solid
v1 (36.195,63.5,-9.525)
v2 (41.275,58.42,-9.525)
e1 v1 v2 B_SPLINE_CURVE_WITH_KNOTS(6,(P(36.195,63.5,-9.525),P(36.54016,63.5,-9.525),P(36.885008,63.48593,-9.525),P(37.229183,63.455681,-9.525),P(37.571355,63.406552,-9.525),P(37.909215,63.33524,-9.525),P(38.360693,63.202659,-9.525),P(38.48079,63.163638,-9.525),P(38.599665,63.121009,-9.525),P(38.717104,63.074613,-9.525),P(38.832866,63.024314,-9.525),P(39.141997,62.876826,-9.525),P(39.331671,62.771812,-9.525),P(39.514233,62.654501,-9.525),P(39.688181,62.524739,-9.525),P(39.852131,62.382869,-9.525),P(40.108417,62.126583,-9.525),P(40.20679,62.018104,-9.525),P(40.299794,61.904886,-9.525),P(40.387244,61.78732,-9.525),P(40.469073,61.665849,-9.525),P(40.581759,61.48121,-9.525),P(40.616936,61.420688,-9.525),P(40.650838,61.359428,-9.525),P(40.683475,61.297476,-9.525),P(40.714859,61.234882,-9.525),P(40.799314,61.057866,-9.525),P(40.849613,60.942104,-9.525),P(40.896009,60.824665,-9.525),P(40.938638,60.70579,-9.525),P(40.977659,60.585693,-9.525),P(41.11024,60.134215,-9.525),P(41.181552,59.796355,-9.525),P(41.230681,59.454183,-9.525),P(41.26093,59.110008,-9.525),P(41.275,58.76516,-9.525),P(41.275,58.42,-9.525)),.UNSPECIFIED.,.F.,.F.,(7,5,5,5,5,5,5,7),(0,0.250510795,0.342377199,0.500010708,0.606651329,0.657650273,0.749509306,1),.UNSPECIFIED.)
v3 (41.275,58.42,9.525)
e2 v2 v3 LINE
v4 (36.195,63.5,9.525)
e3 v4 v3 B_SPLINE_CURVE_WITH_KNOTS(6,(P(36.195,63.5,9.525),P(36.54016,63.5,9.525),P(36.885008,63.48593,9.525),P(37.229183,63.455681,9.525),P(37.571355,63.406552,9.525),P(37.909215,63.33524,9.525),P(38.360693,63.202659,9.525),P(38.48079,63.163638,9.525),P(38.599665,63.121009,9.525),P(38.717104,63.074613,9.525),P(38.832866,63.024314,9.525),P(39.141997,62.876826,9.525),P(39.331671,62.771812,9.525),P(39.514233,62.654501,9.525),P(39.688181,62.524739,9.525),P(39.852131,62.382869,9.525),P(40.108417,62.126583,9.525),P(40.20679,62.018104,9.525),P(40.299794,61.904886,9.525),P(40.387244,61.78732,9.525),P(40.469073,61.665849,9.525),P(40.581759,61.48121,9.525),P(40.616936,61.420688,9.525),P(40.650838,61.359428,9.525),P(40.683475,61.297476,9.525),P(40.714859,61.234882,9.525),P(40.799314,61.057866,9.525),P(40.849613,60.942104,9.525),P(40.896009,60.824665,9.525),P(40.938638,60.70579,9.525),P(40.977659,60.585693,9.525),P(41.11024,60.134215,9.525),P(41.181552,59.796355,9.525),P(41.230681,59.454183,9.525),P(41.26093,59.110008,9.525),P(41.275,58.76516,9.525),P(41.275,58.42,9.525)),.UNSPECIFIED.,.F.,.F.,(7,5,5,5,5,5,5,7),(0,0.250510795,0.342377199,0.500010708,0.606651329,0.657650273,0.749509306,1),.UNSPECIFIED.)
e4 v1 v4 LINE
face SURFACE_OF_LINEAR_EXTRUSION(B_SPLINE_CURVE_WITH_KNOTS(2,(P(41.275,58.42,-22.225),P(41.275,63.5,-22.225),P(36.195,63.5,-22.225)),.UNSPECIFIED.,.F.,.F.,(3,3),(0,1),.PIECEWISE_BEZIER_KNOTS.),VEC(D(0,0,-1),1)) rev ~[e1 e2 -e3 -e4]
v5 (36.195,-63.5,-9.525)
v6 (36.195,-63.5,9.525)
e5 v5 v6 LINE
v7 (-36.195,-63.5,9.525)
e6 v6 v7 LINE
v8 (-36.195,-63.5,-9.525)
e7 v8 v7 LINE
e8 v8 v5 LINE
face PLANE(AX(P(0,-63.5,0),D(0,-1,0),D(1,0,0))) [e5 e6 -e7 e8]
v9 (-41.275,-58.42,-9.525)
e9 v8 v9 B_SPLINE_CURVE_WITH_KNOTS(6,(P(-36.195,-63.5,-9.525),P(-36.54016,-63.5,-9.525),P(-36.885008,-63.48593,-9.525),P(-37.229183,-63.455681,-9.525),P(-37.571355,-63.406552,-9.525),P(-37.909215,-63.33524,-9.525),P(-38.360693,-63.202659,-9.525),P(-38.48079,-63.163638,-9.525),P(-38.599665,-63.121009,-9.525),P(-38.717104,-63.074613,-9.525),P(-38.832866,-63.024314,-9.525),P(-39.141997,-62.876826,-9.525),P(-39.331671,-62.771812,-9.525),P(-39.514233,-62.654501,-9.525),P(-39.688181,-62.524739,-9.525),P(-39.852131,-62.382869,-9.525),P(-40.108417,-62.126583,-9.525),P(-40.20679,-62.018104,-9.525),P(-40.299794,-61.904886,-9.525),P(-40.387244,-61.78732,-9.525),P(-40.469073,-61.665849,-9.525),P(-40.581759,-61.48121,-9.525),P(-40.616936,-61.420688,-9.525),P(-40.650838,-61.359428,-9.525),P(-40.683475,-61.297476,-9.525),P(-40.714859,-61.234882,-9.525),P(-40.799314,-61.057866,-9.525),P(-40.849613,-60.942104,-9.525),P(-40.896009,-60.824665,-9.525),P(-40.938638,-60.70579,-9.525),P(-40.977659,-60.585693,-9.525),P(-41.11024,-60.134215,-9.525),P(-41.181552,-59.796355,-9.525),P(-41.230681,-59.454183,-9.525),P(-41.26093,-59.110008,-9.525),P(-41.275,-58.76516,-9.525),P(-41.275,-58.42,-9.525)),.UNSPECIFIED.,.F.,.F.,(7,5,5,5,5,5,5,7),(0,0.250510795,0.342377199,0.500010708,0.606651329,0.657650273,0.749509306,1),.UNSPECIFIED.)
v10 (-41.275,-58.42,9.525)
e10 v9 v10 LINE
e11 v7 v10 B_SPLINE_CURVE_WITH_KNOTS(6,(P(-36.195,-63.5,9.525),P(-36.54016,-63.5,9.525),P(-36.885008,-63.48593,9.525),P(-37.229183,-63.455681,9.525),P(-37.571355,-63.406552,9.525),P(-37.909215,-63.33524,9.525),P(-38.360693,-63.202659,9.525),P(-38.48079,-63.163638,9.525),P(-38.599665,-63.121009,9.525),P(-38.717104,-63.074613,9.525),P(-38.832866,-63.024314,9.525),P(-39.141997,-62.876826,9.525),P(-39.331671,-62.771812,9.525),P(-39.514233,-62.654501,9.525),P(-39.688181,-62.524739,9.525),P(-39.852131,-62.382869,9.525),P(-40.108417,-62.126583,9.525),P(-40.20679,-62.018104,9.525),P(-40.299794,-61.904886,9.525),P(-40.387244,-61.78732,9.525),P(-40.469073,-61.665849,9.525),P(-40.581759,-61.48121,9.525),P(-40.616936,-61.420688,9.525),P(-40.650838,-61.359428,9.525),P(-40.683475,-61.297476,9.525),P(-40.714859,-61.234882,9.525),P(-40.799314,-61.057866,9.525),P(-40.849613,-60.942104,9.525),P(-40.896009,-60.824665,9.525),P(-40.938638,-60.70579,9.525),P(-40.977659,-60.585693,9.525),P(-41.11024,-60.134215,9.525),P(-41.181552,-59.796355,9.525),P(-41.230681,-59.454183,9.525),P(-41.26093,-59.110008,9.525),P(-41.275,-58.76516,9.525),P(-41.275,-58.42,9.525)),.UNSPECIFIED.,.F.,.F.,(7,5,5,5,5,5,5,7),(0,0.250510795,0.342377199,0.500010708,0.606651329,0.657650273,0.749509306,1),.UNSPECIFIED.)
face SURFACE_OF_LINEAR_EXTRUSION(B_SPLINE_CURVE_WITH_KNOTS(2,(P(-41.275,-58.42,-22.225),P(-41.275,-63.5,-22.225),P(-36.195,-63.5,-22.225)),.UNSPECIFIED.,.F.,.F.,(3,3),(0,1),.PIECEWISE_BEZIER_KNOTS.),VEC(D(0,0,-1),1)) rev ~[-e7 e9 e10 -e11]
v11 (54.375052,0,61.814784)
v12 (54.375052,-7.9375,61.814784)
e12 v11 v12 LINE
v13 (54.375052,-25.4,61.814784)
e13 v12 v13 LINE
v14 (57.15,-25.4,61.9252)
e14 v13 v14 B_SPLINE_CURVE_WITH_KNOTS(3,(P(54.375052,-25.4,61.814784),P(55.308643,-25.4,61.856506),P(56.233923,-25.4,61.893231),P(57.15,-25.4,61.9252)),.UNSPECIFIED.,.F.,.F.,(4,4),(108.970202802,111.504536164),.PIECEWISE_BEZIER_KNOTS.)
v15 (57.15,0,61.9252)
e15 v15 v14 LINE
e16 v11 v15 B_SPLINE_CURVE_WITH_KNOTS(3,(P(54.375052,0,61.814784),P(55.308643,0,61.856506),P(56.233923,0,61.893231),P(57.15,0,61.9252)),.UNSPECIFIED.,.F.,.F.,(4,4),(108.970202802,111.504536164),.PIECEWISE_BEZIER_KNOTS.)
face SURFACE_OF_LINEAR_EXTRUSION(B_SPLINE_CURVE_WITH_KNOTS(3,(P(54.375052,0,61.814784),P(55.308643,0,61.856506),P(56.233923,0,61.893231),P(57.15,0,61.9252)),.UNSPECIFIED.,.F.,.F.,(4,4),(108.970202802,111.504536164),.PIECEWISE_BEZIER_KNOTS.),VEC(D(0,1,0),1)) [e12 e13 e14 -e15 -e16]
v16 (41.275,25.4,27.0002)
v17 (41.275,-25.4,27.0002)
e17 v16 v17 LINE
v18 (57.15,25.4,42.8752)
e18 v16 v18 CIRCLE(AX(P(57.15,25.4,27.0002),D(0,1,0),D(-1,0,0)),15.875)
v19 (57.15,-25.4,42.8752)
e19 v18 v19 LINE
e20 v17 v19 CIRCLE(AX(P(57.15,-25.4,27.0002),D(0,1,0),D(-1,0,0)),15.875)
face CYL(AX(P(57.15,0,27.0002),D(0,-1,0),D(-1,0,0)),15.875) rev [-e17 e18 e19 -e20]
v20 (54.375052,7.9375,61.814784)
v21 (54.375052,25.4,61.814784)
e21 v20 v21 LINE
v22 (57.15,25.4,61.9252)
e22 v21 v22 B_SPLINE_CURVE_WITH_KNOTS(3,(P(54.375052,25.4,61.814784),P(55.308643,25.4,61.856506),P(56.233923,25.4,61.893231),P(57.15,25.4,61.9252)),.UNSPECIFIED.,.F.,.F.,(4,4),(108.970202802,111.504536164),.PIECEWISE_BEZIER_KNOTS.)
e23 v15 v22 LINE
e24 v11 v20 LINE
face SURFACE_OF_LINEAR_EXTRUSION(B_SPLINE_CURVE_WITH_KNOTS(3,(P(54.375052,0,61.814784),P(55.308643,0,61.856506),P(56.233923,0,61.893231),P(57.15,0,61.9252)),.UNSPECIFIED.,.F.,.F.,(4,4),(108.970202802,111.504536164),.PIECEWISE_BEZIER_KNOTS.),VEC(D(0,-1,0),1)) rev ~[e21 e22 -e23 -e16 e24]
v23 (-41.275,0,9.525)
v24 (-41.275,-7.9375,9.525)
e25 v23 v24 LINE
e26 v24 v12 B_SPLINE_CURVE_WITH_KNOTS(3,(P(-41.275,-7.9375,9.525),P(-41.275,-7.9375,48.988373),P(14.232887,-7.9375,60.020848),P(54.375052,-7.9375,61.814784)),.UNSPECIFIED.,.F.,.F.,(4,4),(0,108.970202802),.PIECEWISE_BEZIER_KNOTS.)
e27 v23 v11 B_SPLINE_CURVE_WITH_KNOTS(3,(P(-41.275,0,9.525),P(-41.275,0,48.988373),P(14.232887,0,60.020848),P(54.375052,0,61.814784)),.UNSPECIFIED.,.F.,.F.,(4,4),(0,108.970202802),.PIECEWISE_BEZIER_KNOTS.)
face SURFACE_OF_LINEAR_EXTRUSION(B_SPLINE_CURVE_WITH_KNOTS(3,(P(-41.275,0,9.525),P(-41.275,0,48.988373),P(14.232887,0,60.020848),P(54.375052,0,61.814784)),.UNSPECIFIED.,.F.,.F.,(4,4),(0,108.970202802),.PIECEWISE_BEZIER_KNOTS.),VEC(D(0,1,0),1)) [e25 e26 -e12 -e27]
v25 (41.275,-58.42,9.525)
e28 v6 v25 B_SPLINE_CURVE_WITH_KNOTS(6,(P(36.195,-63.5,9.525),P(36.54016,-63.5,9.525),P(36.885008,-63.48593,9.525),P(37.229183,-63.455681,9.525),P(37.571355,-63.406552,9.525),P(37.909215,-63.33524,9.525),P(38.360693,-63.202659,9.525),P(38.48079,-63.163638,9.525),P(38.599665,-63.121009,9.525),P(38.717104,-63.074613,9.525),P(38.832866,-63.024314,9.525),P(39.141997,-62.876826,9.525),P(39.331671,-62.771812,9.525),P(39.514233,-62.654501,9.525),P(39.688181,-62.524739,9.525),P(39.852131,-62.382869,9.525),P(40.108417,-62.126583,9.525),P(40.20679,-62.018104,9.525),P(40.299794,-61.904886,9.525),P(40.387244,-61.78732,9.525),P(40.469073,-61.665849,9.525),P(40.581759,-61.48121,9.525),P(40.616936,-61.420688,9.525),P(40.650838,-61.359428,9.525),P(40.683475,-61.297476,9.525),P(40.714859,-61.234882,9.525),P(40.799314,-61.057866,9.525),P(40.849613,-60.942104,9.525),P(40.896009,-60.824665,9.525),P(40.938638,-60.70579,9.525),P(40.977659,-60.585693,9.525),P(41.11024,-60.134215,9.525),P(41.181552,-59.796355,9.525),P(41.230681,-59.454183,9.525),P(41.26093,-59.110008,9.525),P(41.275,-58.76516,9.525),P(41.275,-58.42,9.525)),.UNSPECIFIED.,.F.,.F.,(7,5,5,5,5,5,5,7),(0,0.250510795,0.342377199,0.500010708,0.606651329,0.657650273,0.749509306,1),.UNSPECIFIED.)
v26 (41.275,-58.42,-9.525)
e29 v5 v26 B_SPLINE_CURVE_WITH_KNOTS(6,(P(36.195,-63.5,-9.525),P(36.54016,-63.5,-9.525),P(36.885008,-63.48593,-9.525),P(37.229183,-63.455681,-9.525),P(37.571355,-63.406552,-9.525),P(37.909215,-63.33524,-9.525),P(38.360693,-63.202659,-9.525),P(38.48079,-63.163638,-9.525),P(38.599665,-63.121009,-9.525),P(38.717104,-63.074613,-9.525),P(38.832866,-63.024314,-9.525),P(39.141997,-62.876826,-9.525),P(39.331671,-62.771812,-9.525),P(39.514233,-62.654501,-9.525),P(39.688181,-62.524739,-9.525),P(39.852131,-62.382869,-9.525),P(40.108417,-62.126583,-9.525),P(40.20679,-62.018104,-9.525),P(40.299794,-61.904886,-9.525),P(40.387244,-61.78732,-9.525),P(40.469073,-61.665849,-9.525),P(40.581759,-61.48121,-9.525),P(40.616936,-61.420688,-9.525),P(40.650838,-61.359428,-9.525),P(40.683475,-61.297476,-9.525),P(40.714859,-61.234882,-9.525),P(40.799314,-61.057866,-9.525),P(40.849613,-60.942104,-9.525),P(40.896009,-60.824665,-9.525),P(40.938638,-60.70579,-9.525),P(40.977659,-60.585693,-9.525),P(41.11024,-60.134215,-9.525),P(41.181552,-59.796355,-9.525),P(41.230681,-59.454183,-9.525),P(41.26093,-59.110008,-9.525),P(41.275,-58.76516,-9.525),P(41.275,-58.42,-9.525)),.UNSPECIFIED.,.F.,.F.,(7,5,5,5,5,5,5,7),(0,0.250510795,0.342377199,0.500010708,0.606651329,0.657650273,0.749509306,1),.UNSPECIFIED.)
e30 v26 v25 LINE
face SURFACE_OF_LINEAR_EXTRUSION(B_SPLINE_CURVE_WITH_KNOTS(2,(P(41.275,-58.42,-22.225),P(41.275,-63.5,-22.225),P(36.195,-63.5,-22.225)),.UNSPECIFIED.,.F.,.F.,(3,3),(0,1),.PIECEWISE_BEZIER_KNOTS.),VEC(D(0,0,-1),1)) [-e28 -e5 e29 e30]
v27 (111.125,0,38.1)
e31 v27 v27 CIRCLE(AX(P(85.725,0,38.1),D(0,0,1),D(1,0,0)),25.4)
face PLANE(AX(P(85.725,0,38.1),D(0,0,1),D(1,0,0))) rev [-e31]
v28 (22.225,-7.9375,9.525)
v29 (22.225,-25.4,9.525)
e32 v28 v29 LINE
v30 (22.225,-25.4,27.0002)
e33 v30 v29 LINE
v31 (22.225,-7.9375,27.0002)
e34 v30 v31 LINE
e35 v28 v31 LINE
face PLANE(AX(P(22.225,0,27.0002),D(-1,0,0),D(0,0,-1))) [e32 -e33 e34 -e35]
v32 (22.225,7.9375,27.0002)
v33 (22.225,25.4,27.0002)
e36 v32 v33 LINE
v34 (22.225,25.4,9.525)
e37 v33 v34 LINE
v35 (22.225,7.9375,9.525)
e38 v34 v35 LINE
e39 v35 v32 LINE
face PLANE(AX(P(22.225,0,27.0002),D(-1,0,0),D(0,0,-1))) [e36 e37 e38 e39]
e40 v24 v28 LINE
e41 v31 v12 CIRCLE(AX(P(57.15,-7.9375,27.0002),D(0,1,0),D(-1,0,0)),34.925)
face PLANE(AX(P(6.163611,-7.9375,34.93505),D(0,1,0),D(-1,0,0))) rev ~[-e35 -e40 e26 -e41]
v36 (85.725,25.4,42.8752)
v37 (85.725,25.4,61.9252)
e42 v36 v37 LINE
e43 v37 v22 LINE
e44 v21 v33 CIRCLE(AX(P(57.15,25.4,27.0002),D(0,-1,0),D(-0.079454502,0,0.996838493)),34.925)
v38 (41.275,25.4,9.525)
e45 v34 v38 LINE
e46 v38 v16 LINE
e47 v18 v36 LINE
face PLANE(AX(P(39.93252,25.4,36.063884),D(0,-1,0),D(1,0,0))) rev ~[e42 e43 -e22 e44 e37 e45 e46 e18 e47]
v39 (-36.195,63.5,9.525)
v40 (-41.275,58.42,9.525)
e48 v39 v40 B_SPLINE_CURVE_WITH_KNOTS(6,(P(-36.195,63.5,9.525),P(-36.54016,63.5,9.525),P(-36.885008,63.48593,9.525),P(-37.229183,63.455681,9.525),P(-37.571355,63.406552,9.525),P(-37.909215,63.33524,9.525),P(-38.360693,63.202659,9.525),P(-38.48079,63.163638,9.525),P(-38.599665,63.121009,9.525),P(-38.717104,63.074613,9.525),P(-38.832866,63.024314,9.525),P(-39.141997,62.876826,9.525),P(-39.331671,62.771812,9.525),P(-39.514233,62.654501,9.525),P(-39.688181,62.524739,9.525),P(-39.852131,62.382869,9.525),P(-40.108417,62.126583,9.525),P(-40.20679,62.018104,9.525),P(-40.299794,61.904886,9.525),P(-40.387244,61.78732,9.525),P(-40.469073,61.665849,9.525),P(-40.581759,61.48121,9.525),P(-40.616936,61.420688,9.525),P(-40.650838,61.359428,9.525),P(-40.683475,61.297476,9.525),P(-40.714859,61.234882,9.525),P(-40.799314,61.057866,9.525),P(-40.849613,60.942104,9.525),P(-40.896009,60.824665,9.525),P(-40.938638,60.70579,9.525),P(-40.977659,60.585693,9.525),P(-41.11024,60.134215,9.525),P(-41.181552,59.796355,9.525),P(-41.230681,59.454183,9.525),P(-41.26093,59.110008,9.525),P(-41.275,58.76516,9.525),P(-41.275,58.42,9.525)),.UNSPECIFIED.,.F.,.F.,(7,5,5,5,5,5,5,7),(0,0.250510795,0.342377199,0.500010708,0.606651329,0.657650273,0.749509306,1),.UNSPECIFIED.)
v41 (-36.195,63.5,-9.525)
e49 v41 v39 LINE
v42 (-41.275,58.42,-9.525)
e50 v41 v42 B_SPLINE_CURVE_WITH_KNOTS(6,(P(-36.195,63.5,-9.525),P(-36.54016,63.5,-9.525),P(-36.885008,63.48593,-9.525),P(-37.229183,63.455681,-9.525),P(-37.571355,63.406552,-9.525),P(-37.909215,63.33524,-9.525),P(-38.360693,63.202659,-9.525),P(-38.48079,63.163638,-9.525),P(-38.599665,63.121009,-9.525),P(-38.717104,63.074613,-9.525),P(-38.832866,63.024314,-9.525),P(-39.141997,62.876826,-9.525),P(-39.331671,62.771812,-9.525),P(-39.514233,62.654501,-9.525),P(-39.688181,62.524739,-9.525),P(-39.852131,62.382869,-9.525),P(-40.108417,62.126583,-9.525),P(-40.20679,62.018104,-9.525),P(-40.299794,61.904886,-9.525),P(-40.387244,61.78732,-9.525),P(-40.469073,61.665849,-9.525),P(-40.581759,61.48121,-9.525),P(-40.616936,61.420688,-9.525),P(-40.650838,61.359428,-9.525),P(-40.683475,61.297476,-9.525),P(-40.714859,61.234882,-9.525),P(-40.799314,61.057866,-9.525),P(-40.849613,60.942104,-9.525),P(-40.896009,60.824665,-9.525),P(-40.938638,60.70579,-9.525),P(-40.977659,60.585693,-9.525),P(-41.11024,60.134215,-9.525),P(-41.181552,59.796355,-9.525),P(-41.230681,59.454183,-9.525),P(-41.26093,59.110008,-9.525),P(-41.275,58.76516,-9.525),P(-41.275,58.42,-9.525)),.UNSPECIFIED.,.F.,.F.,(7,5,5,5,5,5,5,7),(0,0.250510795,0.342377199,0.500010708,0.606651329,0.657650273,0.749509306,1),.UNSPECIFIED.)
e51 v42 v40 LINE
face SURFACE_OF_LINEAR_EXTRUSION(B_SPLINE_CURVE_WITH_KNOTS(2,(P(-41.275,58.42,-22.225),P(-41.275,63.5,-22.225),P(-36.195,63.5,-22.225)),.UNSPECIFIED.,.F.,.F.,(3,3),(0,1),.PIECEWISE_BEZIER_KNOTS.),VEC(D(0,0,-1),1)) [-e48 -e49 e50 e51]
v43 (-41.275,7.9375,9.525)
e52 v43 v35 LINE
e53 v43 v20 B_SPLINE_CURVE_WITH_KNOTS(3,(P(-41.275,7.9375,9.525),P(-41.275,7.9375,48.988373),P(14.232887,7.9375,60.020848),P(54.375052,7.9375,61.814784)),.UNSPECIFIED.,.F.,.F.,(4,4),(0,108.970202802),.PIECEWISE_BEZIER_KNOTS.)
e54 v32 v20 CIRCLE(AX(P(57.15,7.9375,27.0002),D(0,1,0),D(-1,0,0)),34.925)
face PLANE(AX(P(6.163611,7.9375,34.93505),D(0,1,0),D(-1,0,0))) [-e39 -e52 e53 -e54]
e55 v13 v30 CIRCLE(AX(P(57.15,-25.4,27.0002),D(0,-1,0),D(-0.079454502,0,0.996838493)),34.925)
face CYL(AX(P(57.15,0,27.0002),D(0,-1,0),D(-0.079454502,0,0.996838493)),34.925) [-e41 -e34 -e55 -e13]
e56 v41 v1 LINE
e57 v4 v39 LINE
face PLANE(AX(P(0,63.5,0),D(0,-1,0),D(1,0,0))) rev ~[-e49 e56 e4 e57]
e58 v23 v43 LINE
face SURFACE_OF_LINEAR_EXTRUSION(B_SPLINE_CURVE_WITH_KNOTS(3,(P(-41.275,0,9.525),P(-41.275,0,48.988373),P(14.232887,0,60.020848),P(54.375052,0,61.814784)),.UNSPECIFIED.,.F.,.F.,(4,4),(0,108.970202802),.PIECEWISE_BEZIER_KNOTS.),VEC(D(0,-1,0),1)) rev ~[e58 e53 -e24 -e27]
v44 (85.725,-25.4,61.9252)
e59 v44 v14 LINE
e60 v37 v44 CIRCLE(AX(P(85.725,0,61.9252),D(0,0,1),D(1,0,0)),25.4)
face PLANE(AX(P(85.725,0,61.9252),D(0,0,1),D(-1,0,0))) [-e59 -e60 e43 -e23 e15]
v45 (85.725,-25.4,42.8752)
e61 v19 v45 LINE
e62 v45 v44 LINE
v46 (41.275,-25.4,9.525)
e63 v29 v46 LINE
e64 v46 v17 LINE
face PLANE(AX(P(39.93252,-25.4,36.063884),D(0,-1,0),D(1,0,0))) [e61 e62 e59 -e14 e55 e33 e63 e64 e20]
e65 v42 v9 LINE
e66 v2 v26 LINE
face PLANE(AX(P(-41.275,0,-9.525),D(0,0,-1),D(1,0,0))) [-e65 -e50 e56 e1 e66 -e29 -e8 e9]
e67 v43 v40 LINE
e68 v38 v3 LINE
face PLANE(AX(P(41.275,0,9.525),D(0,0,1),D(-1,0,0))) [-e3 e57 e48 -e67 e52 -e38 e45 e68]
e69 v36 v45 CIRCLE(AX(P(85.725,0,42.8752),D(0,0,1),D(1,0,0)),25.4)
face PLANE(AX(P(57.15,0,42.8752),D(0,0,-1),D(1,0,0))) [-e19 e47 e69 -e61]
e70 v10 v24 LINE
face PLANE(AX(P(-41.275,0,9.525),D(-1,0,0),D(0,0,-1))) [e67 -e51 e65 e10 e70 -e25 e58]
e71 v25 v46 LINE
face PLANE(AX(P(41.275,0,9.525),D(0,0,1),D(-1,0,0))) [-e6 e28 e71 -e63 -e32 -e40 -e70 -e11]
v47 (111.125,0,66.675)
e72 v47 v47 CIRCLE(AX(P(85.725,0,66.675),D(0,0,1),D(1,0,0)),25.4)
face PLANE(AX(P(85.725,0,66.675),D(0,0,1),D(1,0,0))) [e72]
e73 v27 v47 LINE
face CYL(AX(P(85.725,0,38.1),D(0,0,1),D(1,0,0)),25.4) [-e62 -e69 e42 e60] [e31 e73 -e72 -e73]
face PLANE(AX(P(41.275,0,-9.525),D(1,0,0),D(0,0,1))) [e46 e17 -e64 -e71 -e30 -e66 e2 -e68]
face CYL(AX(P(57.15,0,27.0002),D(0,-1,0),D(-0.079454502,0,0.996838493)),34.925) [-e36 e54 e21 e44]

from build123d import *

# Parameters (mm, degrees)
F1_DEPTH    = 63.5
F0_W        = 25.4
F0_H        = 19.05
F2_DEPTH    = 25.4
F3_DEPTH    = 7.9375
F5_T1_DEPTH = 44.45


# Not quite as in the source:
# - a fillet or chamfer that OpenCascade refuses, or shapes differently, is made with other operations: its cross-section is extruded or revolved along the edge and cut away or added


with BuildPart() as f1:
    # F0 (on Front) → F1 (new body, symmetric)
    with BuildSketch(Plane.XZ):
        Polygon((22.225, 9.525), (-41.275, 9.525), (-41.275, -9.525), (41.275, -9.525), (41.275, 9.525), align=None)
    extrude(amount=F1_DEPTH, both=True)

    # F0 (on Front) → F2 (join, symmetric)
    with BuildSketch(Plane.XZ):
        with BuildLine():
            Line((22.225, 27.0002), (22.225, 9.525))
            Line((22.225, 9.525), (41.275, 9.525))
            Line((41.275, 9.525), (41.275, 27.0002))
            ThreePointArc((41.275, 27.0002), (45.9246798487, 38.2255201513), (57.15, 42.8752))
            Line((57.15, 42.8752), (60.325, 42.8752))
            Line((60.325, 42.8752), (60.325, 61.9252))
            Line((60.325, 61.9252), (57.15, 61.9252))
            add(Edge.make_bspline(
                [(54.3750515166, 61.8147843852), (55.3086427557, 61.8565061807), (56.2339227715, 61.893230908), (57.15, 61.9252)],
                knots=[108.9702028018, 108.9702028018, 108.9702028018, 108.9702028018, 111.5045361635, 111.5045361635, 111.5045361635, 111.5045361635], degree=3))
            ThreePointArc((54.3750515166, 61.8147843852), (31.4919534962, 50.6945089076), (22.225, 27.0002))
        make_face()
        with Locations((73.025, 52.4002)):
            Rectangle(F0_W, F0_H)
    extrude(amount=F2_DEPTH, both=True)

    # F0 (on Front) → F3 (join, symmetric)
    with BuildSketch(Plane.XZ):
        with BuildLine():
            add(Edge.make_bspline(
                [(-41.275, 9.525), (-41.275, 48.9883726548), (14.232887036, 60.0208481258), (54.3750515166, 61.8147843852)],
                knots=[0, 0, 0, 0, 108.9702028018, 108.9702028018, 108.9702028018, 108.9702028018], degree=3))
            Line((-41.275, 9.525), (22.225, 9.525))
            Line((22.225, 9.525), (22.225, 27.0002))
            ThreePointArc((22.225, 27.0002), (31.4919534962, 50.6945089076), (54.3750515166, 61.8147843852))
        make_face()
    extrude(amount=F3_DEPTH, both=True)

    # F0 (on Front) → F4 (revolve)
    with BuildSketch(Plane.XZ):
        Polygon((85.725, 66.675), (85.725, 61.9252), (85.725, 42.8752), (85.725, 38.1), (111.125, 38.1), (111.125, 66.675), align=None)
    revolve(axis=Axis((85.725, 0, 52.3875), (0, 0, 1)))

    # F5: fillet of radius 5.08 on 4 edges, made by hand

    # F5_s2 → F5_t1 (cut)
    with BuildSketch(Plane.XY.offset(-22.225)):
        with BuildLine():
            add(Edge.make_bspline(
                [(41.275, -58.42), (41.275, -63.5), (36.195, -63.5)],
                knots=[0, 0, 0, 1, 1, 1], degree=2, weights=[1, 1, 1]))
            Line((36.195, -63.5), (41.275, -63.5))
            Line((41.275, -63.5), (41.275, -58.42))
        make_face()
        with BuildLine():
            add(Edge.make_bspline(
                [(-41.275, -58.42), (-41.275, -63.5), (-36.195, -63.5)],
                knots=[0, 0, 0, 1, 1, 1], degree=2, weights=[1, 1, 1]))
            Line((-36.195, -63.5), (-41.275, -63.5))
            Line((-41.275, -63.5), (-41.275, -58.42))
        make_face()
        with BuildLine():
            add(Edge.make_bspline(
                [(41.275, 58.42), (41.275, 63.5), (36.195, 63.5)],
                knots=[0, 0, 0, 1, 1, 1], degree=2, weights=[1, 1, 1]))
            Line((36.195, 63.5), (41.275, 63.5))
            Line((41.275, 63.5), (41.275, 58.42))
        make_face()
        with BuildLine():
            add(Edge.make_bspline(
                [(-41.275, 58.42), (-41.275, 63.5), (-36.195, 63.5)],
                knots=[0, 0, 0, 1, 1, 1], degree=2, weights=[1, 1, 1]))
            Line((-36.195, 63.5), (-41.275, 63.5))
            Line((-41.275, 63.5), (-41.275, 58.42))
        make_face()
    extrude(amount=F5_T1_DEPTH, mode=Mode.SUBTRACT)


solid = f1.part
